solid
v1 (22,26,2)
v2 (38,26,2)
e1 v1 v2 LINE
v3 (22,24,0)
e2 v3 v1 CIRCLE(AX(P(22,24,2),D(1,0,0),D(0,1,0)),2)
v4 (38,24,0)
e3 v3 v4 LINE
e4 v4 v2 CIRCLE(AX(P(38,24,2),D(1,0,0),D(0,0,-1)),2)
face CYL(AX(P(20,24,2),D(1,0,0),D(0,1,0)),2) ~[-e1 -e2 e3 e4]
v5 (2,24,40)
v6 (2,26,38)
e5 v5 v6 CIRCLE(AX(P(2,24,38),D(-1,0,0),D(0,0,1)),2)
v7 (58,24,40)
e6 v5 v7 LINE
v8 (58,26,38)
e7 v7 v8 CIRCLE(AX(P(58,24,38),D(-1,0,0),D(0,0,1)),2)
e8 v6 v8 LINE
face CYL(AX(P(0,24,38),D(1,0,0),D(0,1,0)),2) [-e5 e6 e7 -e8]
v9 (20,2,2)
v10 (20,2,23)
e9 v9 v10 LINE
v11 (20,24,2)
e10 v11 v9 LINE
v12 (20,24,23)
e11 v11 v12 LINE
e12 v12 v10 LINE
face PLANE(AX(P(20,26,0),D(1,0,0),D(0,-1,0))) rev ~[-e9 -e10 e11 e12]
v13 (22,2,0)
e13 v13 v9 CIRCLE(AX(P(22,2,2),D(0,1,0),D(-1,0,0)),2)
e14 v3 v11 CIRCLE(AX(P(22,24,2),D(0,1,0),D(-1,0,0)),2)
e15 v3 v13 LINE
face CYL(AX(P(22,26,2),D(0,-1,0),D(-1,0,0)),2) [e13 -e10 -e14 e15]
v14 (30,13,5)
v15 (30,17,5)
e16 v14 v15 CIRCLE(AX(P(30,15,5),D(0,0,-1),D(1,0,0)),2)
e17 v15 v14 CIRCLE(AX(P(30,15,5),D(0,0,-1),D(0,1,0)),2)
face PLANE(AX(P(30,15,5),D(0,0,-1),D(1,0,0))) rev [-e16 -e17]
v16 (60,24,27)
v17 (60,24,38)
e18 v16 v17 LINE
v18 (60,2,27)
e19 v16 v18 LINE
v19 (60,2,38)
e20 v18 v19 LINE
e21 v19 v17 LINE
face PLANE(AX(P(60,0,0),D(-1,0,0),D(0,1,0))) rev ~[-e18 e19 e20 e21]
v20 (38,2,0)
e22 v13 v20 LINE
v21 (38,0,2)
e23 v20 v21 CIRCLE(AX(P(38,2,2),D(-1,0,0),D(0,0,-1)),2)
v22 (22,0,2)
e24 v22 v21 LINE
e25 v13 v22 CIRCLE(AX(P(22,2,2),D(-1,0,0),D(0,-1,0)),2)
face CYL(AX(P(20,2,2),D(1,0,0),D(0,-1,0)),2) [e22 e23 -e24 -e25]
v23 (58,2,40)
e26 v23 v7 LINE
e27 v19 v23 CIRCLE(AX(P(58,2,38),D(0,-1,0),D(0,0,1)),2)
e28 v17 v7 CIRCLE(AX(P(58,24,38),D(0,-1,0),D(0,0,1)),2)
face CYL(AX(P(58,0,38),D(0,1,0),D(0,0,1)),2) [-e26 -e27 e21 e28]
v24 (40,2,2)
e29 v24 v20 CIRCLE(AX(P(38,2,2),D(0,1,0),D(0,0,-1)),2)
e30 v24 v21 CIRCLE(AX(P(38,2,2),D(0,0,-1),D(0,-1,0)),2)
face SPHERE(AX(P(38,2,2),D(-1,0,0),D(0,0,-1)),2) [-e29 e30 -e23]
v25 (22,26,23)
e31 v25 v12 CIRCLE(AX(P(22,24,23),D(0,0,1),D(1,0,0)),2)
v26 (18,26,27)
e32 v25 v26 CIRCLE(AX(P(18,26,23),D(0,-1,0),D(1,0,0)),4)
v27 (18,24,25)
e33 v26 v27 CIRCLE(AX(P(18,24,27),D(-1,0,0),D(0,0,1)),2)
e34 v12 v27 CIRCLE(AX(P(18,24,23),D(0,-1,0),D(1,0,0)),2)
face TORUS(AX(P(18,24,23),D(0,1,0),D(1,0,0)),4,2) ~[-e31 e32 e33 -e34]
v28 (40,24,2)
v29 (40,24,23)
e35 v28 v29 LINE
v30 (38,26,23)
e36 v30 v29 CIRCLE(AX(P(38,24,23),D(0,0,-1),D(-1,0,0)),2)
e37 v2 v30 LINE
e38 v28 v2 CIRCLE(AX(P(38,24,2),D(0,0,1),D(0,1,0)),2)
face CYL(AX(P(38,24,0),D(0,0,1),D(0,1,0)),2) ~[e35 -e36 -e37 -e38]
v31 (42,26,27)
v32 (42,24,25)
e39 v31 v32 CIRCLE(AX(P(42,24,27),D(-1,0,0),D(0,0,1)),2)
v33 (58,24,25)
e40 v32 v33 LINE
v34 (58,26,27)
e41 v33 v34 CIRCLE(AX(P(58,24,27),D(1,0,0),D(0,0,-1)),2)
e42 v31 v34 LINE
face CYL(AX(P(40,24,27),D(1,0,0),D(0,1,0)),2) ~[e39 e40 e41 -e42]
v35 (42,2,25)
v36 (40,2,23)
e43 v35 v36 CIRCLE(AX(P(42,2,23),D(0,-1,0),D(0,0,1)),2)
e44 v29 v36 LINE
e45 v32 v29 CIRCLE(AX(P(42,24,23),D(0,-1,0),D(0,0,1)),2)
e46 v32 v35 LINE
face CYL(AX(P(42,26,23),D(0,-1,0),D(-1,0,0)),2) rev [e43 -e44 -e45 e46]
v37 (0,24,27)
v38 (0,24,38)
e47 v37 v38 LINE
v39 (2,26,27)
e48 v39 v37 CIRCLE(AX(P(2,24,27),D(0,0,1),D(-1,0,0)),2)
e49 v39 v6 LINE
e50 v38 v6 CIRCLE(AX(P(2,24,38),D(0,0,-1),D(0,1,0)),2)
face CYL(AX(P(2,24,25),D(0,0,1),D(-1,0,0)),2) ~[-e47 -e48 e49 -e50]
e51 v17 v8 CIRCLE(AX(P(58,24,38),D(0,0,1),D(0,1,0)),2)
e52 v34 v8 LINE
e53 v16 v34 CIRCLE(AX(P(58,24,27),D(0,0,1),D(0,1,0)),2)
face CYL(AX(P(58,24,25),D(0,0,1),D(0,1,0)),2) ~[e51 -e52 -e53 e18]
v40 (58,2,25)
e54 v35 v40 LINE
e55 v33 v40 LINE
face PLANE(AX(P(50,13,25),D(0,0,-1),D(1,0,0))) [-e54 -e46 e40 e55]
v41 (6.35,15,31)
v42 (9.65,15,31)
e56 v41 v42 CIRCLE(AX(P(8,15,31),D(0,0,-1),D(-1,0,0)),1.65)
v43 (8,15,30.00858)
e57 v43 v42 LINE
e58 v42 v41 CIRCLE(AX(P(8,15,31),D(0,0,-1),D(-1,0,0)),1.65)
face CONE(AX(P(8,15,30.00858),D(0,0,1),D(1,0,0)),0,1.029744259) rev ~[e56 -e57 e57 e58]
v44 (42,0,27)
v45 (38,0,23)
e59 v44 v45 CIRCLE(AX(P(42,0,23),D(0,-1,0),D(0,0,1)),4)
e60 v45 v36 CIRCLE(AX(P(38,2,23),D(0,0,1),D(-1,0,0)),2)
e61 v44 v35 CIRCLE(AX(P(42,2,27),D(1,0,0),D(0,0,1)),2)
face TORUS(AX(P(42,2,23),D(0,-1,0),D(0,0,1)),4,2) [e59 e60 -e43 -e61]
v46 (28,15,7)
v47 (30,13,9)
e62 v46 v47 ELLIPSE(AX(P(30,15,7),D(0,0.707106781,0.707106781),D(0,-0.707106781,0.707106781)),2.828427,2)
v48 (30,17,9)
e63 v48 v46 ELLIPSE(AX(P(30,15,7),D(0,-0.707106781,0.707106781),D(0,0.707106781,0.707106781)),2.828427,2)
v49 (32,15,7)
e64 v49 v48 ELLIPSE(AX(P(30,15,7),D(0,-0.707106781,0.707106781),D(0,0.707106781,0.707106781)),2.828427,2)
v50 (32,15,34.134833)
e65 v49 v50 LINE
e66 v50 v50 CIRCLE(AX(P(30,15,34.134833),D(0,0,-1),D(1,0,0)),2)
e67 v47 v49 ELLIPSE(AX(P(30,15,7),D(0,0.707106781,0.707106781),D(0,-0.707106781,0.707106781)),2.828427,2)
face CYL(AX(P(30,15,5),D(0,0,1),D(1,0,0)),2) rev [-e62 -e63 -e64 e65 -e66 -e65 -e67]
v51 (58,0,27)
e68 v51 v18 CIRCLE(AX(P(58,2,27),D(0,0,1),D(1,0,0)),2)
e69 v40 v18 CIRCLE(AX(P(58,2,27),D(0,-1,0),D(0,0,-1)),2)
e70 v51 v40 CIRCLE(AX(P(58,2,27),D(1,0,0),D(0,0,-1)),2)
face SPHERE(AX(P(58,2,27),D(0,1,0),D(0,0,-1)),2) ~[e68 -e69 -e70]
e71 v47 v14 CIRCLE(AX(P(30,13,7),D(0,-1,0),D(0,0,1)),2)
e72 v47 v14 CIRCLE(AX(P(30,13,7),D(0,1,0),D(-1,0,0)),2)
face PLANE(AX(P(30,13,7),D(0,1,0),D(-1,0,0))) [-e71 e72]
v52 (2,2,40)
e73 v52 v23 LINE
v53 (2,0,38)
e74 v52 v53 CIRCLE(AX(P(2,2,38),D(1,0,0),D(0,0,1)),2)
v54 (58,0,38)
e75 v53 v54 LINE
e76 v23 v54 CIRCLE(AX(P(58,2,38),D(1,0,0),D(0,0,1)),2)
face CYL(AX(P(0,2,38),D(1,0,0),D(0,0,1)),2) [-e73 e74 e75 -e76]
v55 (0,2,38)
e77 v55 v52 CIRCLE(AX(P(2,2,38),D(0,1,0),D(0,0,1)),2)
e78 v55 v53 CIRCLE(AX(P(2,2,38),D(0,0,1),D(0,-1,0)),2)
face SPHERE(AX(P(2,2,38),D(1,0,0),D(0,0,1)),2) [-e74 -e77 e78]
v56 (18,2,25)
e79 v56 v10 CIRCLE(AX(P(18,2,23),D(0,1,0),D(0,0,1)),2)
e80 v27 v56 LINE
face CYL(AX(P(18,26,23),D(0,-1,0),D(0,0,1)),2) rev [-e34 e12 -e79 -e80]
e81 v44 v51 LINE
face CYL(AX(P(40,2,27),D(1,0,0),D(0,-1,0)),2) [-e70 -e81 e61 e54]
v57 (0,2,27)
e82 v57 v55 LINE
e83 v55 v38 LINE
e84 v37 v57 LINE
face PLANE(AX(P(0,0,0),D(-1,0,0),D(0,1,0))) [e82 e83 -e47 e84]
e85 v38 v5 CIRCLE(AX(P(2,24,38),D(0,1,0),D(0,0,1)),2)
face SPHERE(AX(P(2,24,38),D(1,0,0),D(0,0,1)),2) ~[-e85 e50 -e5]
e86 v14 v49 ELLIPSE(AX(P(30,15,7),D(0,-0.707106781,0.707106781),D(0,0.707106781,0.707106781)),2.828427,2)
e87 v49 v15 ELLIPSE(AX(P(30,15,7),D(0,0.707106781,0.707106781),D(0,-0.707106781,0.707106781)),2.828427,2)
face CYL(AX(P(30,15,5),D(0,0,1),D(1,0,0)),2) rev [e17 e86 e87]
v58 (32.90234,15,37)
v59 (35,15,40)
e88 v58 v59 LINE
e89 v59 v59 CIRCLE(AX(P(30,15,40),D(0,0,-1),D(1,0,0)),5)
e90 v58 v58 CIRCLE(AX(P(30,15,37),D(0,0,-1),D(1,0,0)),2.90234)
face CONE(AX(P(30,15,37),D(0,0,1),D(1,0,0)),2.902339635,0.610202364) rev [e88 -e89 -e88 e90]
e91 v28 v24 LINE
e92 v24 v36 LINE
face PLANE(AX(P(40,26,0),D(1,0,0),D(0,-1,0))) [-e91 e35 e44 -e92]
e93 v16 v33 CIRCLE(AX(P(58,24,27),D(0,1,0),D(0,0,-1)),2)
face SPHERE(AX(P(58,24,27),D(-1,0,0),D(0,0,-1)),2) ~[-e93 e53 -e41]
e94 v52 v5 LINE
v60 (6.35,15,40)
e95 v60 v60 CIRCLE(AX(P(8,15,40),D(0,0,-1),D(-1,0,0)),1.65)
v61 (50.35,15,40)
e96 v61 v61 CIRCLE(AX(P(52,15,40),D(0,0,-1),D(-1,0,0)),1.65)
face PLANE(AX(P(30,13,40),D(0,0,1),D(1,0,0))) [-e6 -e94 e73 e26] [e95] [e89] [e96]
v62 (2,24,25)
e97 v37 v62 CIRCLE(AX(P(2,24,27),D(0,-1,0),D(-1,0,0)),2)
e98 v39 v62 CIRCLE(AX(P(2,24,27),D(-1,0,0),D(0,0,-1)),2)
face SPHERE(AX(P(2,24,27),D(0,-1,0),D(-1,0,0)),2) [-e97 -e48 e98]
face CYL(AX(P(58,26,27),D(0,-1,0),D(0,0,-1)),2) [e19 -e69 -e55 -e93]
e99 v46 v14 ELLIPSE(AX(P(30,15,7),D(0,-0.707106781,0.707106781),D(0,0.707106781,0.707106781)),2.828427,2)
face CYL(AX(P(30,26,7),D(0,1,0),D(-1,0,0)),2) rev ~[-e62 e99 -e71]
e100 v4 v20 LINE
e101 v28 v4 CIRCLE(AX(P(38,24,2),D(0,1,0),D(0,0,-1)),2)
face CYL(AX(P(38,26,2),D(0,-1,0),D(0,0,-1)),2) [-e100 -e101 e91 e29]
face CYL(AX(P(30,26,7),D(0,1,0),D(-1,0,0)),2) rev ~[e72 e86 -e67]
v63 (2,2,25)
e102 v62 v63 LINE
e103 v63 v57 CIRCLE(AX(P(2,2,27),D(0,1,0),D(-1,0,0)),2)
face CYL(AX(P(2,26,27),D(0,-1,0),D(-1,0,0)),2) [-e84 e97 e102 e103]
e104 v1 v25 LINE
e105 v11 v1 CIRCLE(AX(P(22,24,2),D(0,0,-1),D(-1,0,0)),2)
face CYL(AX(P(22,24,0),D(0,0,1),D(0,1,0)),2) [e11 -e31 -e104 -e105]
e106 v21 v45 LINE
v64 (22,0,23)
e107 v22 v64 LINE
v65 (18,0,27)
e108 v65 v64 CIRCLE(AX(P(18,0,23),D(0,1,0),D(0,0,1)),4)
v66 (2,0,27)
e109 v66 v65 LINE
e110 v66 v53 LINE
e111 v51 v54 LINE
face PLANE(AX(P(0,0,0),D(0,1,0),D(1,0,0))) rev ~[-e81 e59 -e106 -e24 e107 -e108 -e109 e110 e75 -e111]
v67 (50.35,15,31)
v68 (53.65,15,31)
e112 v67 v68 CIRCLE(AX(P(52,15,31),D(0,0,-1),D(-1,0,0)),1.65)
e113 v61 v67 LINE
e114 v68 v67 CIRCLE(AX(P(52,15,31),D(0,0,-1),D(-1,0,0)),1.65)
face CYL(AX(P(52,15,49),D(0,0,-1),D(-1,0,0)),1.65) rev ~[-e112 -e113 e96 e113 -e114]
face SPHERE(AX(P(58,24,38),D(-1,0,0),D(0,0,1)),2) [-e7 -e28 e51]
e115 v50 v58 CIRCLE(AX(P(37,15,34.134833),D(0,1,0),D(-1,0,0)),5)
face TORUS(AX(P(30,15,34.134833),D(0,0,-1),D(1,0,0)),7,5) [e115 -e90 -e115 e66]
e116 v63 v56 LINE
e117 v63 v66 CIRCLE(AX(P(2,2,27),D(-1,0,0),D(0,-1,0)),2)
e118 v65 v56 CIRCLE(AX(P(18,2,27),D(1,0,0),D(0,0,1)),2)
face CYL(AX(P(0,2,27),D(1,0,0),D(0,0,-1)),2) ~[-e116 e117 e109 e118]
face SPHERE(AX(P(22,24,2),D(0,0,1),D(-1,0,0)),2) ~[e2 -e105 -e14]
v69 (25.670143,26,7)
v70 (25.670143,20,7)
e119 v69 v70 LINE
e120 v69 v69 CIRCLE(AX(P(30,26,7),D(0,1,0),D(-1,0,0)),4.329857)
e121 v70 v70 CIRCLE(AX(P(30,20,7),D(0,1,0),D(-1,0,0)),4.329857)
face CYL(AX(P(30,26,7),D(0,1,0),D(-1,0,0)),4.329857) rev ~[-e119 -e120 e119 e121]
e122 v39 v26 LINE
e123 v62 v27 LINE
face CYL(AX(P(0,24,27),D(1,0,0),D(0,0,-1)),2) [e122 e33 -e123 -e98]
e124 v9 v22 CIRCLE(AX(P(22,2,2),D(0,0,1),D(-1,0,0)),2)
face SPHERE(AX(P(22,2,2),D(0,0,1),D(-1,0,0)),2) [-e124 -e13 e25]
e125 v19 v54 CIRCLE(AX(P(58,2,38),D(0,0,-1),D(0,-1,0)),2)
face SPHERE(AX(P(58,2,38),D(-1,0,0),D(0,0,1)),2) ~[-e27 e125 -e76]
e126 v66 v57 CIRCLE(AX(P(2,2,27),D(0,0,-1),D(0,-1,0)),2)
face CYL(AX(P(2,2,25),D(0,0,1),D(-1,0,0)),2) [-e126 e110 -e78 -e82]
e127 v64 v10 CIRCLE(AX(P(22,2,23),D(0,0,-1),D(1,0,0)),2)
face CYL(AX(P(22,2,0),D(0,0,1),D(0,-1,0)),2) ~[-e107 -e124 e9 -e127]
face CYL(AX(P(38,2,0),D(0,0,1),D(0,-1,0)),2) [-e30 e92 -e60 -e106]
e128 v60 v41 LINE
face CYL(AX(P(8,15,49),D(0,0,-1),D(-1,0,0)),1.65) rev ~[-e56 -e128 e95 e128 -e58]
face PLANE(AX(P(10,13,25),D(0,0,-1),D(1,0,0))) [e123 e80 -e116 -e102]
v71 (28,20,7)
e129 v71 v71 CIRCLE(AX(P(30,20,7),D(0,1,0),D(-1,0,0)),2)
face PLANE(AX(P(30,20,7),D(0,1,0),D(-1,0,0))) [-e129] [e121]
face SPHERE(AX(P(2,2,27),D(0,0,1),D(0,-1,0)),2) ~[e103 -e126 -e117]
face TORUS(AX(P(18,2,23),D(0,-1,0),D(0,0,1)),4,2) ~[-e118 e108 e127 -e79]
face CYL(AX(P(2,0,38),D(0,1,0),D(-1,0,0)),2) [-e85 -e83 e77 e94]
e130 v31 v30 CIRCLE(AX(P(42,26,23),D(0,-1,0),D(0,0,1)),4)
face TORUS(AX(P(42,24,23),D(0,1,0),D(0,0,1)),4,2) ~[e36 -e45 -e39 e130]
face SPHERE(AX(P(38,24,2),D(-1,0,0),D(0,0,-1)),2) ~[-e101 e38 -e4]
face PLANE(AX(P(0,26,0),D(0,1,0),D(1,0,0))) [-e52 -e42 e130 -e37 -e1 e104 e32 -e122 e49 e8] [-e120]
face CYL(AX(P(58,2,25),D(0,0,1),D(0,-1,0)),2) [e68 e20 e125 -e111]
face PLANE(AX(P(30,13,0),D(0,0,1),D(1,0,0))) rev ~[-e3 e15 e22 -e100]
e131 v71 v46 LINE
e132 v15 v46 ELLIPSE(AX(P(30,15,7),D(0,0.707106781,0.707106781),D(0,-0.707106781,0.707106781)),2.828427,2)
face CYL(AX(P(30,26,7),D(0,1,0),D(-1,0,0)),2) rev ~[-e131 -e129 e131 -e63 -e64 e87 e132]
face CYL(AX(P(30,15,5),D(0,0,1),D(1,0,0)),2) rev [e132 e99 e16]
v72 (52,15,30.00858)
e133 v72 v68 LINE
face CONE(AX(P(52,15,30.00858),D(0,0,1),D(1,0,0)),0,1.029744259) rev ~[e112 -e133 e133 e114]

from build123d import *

# Parameters (mm, degrees)
F0_W      = 60
F0_H      = 26
F1_DEPTH  = 40
F5_R      = 2
F6_DEPTH  = 13
F8_D      = 3.3
F8_DEPTH  = 9
F8_TIP    = 0.9914200214
F9_R      = 4.3298566402
F10_DEPTH = 6
F11_W     = 20
F11_H     = 26
F12_DEPTH = 25
F13_R     = 2


with BuildPart() as f1:
    # F0 (on Top) → F1 (new body)
    with BuildSketch(Plane.XY):
        with Locations((30, 13)):
            Rectangle(F0_W, F0_H)
    extrude(amount=F1_DEPTH)

    # F3 (on offset) → F4 (revolve, cut)
    with BuildSketch(Plane.XZ.offset(-15)):
        with BuildLine():
            Line((35, 40), (30, 40))
            Line((30, 40), (30, 5))
            Line((30, 5), (32, 5))
            Line((32, 5), (32, 34.1348334202))
            ThreePointArc((32, 34.1348334202), (32.2309171832, 35.6367818503), (32.9023396346, 37))
            Line((32.9023396346, 37), (35, 40))
        make_face()
    revolve(axis=Axis((30, 15, 22.5), (0, 0, -1)), mode=Mode.SUBTRACT)

    # F5 (on face) → F6 (cut)
    with BuildSketch(Plane(origin=(0, 26, 0), x_dir=(-1, 0, 0), z_dir=(0, 1, 0))):
        with Locations((-30, 7)):
            Circle(F5_R)
    extrude(amount=-F6_DEPTH, mode=Mode.SUBTRACT)

    # F8
    with Locations(Plane.XY.offset(40)):
        with Locations((8, 15), (52, 15)):
            Hole(F8_D / 2, depth=F8_DEPTH)
            with Locations((0, 0, -(F8_DEPTH + F8_TIP / 2))):  # 118° drill point
                Cone(0, F8_D / 2, F8_TIP, mode=Mode.SUBTRACT)

    # F9 (on face) → F10 (cut)
    with BuildSketch(Plane(origin=(0, 26, 0), x_dir=(-1, 0, 0), z_dir=(0, 1, 0))):
        with Locations((-30, 7)):
            Circle(F9_R)
    extrude(amount=-F10_DEPTH, mode=Mode.SUBTRACT)

    # F11 (on face) → F12 (cut)
    with BuildSketch(Plane(origin=(0, 0, 0), x_dir=(1, 0, 0), z_dir=(0, 0, -1))):
        with Locations((10, -13)):
            Rectangle(F11_W, F11_H)
        with Locations((50, -13)):
            Rectangle(F11_W, F11_H)
    extrude(amount=-F12_DEPTH, mode=Mode.SUBTRACT)

    # F13
    f13_edges = [f1.edges().sort_by_distance(p)[0] for p in [
        (30, 26, 40),
        (30, 0, 40),
        (60, 13, 40),
        (0, 13, 40),
        (0, 0, 32.5),
        (10, 0, 25),
        (0, 13, 25),
        (20, 0, 12.5),
        (20, 13, 25),
        (20, 26, 12.5),
        (20, 13, 0),
        (30, 26, 0),
        (30, 0, 0),
        (40, 13, 0),
        (40, 26, 12.5),
        (40, 13, 25),
        (50, 26, 25),
        (60, 13, 25),
        (50, 0, 25),
        (40, 0, 12.5),
        (60, 26, 32.5),
        (60, 0, 32.5),
        (0, 26, 32.5),
        (10, 26, 25),
    ]]
    fillet(f13_edges, radius=F13_R)


solid = f1.part
